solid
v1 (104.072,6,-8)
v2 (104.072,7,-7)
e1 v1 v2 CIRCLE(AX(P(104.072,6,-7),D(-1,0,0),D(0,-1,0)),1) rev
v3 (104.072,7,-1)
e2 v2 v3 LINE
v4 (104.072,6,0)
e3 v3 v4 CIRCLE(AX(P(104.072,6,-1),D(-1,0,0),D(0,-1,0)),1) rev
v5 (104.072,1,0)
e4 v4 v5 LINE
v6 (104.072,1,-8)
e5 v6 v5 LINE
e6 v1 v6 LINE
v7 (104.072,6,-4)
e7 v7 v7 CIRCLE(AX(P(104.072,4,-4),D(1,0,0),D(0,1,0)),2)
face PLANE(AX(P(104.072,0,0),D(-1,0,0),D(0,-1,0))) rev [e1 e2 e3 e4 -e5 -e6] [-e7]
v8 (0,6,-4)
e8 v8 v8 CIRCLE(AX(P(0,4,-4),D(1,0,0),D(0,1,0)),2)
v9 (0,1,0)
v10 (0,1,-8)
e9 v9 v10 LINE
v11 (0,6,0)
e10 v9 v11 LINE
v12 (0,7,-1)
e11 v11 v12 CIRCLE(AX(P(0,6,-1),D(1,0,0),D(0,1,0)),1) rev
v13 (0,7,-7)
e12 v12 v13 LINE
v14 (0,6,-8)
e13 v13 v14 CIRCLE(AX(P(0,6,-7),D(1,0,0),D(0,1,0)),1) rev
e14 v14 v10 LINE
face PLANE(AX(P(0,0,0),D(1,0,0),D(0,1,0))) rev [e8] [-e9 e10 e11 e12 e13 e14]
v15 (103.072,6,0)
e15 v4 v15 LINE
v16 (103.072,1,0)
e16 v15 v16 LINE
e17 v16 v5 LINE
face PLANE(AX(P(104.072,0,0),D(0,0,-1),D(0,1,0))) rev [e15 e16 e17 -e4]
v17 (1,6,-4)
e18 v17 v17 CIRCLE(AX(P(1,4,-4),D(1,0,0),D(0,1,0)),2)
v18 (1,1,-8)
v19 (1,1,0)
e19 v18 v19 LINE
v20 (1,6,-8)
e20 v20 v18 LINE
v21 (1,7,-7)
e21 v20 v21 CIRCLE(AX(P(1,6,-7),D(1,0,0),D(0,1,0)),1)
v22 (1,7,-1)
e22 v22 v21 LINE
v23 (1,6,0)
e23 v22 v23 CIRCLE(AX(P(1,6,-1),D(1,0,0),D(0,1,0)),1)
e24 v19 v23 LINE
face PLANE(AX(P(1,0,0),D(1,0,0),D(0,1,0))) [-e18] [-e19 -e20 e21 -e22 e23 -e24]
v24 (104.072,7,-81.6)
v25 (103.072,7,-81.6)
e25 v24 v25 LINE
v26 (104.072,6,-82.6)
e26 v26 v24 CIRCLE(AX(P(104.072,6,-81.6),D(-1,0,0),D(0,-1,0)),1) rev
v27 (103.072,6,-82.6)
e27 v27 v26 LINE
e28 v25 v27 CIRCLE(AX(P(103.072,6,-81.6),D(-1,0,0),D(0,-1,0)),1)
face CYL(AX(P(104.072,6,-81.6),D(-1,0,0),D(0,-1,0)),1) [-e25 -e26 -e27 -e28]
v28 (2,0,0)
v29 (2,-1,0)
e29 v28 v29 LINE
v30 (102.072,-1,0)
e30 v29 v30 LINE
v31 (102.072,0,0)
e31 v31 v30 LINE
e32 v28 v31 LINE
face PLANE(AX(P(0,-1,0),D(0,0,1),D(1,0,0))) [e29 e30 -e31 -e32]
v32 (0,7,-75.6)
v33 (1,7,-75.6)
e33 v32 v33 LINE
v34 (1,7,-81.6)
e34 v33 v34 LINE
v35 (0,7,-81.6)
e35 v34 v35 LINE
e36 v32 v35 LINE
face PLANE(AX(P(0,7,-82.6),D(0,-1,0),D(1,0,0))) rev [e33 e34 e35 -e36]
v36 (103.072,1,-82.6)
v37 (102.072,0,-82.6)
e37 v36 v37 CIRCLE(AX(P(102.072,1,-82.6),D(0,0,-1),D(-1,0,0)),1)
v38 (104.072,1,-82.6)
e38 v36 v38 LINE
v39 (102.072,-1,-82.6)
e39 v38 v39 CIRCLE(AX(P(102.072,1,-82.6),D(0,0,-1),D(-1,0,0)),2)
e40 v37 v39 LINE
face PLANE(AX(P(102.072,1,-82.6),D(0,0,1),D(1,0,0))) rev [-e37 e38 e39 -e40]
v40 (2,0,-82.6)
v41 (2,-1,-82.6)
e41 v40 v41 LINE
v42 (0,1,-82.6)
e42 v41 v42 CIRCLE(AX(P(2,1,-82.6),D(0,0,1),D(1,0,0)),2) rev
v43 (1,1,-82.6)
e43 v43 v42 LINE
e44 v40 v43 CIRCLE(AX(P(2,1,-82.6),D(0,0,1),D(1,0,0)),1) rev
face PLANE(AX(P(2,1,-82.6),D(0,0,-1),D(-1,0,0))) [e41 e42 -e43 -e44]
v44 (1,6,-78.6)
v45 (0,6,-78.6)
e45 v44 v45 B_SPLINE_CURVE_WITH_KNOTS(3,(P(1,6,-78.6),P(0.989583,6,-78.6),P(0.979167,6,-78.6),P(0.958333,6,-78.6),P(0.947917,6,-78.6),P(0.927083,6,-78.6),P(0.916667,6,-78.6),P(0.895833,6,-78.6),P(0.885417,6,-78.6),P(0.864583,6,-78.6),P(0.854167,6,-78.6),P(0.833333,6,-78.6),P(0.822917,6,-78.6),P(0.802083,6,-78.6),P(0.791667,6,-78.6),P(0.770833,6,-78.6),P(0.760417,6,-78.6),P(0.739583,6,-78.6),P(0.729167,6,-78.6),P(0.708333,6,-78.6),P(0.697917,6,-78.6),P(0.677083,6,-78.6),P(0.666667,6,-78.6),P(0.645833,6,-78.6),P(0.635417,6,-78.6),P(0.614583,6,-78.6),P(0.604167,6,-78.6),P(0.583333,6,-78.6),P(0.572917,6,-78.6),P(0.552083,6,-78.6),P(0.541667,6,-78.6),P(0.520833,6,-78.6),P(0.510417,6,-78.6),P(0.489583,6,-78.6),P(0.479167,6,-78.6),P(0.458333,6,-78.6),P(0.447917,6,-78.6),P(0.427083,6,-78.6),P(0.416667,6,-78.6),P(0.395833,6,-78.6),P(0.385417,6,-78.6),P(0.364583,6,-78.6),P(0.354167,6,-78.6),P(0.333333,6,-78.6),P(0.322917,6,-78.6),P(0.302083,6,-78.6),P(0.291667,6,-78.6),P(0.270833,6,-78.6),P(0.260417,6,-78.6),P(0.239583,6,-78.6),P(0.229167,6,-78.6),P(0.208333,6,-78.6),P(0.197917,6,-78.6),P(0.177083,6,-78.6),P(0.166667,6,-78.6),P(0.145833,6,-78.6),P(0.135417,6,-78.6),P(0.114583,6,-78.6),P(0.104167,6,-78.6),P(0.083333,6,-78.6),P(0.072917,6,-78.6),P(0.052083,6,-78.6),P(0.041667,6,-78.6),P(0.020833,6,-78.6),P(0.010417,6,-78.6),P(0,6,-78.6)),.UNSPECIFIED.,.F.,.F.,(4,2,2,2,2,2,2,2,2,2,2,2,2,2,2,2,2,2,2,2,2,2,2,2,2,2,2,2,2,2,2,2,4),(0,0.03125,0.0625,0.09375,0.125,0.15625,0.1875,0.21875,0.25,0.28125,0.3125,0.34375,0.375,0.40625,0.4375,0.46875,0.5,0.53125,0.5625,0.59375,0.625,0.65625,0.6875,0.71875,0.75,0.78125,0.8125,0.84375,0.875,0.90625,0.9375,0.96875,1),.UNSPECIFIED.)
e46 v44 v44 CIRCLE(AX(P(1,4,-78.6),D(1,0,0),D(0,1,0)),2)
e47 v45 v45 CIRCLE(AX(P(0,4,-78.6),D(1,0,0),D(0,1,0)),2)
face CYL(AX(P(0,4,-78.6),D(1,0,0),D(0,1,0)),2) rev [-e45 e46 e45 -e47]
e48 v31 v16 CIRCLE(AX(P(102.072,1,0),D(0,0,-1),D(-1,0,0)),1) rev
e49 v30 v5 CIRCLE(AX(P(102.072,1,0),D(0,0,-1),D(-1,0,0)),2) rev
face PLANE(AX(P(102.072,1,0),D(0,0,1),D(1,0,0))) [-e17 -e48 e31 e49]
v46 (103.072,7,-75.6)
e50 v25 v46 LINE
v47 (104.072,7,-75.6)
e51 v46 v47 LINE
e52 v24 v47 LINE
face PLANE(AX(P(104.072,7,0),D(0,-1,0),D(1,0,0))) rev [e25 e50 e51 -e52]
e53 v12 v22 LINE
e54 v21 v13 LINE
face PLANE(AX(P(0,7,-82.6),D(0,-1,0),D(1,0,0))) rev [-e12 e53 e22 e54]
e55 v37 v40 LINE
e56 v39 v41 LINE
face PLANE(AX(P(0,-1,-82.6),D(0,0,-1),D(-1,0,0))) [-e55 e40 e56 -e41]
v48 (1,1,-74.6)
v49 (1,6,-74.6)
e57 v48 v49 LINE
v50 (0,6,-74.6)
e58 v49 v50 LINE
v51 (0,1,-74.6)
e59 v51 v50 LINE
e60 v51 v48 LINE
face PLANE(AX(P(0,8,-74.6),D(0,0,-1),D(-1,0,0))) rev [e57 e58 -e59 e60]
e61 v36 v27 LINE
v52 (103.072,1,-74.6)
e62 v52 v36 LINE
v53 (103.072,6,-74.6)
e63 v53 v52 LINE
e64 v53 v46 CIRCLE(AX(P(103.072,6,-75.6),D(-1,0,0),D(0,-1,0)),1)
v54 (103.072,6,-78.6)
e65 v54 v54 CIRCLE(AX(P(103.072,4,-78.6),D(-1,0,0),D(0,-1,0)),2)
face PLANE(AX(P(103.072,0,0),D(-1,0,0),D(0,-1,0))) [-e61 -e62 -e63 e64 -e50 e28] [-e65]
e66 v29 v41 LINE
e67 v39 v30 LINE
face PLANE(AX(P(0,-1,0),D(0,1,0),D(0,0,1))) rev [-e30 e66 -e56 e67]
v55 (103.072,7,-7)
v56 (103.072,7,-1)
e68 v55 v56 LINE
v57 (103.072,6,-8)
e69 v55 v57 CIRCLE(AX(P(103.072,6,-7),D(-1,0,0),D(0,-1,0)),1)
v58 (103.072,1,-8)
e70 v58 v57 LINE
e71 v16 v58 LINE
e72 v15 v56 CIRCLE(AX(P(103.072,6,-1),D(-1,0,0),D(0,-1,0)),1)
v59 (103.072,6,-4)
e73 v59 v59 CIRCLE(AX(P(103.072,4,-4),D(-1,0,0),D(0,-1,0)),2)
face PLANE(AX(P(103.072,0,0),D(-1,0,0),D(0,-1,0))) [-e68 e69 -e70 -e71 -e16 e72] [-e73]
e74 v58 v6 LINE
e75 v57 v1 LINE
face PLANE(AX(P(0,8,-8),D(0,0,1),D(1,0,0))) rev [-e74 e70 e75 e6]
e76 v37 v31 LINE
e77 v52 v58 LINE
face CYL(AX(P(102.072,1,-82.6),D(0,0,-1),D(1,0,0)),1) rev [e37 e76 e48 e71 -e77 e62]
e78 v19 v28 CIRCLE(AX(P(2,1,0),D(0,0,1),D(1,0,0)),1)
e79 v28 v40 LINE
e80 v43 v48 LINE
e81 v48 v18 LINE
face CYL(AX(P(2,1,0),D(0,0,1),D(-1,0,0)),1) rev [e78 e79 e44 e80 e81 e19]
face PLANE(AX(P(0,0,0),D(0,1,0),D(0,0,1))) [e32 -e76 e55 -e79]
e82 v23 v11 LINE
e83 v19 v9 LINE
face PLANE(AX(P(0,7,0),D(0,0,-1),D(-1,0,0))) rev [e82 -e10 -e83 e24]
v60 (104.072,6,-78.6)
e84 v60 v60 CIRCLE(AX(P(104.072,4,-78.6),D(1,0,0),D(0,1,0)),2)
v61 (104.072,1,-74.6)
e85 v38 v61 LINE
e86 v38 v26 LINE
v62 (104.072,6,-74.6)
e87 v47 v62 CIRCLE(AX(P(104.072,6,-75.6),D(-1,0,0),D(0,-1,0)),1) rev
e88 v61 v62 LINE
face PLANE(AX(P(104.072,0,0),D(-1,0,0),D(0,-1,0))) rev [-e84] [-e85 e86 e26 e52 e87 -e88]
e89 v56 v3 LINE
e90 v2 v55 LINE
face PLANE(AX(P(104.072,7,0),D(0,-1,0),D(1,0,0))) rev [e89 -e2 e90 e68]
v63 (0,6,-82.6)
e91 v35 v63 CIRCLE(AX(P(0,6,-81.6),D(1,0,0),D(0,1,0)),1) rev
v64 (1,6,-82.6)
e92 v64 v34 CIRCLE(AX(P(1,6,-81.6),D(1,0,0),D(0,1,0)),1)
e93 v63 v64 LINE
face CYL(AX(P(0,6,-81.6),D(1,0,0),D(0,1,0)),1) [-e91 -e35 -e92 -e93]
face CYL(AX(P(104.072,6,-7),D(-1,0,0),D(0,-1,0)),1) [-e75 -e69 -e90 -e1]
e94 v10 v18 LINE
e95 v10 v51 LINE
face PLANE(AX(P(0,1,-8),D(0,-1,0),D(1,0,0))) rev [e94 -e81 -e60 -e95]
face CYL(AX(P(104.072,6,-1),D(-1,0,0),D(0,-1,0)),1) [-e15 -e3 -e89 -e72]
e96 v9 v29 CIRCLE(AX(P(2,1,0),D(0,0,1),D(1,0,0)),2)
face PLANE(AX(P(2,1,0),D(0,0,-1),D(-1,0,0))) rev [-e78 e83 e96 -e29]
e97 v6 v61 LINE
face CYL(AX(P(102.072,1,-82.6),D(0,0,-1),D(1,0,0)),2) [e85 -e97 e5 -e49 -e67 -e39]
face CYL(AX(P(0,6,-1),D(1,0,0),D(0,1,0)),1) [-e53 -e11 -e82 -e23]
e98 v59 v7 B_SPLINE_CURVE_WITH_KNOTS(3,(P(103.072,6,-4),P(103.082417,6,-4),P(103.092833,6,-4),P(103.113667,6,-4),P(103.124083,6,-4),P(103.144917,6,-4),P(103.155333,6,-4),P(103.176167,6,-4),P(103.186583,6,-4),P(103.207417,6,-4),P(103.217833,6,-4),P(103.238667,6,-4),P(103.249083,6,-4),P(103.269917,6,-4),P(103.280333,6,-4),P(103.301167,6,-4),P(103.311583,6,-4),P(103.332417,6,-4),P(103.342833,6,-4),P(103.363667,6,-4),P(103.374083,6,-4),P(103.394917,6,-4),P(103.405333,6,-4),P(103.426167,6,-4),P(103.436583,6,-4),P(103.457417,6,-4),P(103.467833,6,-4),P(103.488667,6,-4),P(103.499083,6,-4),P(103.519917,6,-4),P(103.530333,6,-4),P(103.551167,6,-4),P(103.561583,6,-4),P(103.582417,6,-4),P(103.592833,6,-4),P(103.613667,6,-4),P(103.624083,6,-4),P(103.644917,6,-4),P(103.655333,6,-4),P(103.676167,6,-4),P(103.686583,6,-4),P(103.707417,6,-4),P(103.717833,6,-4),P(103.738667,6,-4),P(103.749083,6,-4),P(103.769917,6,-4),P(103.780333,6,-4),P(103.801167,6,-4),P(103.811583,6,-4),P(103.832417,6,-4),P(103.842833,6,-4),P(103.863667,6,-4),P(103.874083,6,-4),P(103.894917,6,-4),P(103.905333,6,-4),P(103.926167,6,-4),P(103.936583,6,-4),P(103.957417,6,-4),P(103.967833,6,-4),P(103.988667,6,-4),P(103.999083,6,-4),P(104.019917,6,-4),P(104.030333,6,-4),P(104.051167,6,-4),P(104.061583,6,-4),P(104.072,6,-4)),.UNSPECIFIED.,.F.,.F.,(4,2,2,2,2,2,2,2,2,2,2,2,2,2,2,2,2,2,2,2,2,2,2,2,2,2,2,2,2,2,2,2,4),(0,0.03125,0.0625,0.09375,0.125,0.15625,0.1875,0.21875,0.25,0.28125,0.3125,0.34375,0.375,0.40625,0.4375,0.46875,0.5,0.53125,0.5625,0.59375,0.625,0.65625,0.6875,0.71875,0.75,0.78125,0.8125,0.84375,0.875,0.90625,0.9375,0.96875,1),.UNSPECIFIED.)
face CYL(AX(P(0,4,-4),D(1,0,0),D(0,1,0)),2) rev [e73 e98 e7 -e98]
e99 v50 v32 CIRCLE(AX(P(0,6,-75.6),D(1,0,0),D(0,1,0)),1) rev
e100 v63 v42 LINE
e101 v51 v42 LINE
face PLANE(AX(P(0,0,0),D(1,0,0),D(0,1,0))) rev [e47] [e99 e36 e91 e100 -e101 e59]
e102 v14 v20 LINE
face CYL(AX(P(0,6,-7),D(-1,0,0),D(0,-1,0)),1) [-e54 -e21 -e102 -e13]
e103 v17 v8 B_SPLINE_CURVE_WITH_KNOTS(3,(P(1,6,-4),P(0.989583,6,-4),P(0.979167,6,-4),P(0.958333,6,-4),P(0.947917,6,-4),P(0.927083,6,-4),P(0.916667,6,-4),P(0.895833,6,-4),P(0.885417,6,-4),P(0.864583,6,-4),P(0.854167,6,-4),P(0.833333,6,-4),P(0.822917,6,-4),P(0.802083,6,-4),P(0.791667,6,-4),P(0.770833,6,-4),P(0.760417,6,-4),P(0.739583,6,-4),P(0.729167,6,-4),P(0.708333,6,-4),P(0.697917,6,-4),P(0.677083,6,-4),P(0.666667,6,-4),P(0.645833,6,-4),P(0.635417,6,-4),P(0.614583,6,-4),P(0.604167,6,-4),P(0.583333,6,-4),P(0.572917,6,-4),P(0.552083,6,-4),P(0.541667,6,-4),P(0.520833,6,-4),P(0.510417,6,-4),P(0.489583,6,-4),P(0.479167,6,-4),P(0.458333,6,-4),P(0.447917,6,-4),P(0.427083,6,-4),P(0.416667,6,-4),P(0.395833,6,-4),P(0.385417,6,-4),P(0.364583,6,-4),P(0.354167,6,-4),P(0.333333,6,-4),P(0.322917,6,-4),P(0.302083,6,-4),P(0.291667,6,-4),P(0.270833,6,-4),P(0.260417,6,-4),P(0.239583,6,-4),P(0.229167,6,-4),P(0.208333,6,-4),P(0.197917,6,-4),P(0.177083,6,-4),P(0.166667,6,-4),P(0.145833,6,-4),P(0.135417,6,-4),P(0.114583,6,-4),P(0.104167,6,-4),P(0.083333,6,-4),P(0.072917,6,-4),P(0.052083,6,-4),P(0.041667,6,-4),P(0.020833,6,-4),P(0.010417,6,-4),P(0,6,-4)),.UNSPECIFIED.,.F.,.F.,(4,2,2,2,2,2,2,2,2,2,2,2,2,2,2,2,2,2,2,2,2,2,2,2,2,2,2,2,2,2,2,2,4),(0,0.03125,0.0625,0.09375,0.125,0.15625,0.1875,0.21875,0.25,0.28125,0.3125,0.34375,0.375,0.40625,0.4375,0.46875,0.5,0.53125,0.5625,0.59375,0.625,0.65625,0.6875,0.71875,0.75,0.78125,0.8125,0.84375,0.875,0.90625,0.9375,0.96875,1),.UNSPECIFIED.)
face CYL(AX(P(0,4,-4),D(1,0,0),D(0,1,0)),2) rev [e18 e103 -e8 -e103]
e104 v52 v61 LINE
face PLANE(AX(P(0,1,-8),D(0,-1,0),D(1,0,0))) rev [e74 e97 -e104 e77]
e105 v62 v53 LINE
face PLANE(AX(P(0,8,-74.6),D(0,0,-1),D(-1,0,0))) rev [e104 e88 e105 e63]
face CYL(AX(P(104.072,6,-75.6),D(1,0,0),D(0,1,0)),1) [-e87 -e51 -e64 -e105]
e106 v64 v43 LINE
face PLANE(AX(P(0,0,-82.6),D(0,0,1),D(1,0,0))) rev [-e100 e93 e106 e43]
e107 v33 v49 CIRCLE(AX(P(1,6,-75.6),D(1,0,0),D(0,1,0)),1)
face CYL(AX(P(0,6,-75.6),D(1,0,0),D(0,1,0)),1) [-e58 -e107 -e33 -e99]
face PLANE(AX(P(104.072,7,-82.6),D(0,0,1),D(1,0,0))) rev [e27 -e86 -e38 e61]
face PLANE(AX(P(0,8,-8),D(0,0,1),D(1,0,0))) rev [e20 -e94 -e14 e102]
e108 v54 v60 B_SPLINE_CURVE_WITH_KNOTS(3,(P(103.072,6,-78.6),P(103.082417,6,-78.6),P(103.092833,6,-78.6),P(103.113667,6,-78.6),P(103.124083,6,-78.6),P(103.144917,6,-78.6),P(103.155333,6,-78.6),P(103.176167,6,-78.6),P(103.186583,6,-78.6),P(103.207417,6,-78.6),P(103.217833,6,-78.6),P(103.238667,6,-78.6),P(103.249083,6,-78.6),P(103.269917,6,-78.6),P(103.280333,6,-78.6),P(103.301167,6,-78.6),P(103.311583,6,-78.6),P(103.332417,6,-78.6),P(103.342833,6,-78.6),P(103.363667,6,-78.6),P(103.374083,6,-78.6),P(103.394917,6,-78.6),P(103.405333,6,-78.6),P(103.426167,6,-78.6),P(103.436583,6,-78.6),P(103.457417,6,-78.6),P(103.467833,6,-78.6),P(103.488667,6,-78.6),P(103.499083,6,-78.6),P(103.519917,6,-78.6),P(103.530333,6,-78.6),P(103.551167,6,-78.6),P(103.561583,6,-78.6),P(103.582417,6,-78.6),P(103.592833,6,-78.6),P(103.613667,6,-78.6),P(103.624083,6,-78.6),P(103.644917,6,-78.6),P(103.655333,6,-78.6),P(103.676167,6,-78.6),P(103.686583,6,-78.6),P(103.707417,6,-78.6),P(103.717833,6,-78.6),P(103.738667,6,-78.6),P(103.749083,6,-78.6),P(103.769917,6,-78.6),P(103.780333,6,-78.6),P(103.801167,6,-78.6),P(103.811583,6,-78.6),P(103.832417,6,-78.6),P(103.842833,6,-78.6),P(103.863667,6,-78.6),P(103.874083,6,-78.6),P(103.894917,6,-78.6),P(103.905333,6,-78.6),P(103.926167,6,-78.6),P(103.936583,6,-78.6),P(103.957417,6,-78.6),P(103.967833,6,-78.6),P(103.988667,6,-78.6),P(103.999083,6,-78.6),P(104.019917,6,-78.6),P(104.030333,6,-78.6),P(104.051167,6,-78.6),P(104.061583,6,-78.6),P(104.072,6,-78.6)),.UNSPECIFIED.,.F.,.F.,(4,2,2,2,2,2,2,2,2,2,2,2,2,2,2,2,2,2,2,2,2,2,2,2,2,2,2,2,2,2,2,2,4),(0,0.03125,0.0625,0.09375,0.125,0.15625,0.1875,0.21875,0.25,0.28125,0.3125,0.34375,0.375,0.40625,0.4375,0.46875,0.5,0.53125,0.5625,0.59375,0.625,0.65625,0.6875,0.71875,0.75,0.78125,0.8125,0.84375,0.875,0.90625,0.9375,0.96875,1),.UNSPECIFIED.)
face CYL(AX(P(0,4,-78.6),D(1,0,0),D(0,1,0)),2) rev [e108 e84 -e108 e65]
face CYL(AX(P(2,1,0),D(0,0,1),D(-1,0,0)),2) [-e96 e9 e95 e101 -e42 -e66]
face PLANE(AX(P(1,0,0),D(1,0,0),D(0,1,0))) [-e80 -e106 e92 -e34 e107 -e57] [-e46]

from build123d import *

# Parameters (mm, degrees)
SKETCH1_W                      = 104.072
SKETCH1_H                      = 82.6
BASE_FLANGE2_DEPTH             = 1
EDGE_FLANGE1_STRIP_W           = 6
EDGE_FLANGE1_STRIP_H           = 1
EDGE_FLANGE1_STRIP_CUT_DEPTH   = 82.6
EDGE_FLANGE1_STRIP_2_W         = 6
EDGE_FLANGE1_STRIP_2_H         = 1
EDGE_FLANGE1_STRIP_CUT_2_DEPTH = 82.6
EDGE_FLANGE1_DEPTH             = 82.6
EDGE_FLANGE1_BEND_DEPTH        = 82.6
SKETCH16_W                     = 66.6
SKETCH16_H                     = 7
CUT_EXTRUDE1_DEPTH             = 134.051648558
FILLET1_R                      = 1
SKETCH17_R                     = 2
CUT_EXTRUDE2_DEPTH             = 134.051648558


# Sheet-metal steps are written as plain solids
with BuildPart() as part:
    # Sketch1 → Base-Flange2 (new body)
    with BuildSketch(Plane(origin=(0, 0, 0), x_dir=(1, 0, 0), z_dir=(0, 1, 0))):
        with Locations((52.036, 41.3)):
            Rectangle(SKETCH1_W, SKETCH1_H)
    extrude(amount=-BASE_FLANGE2_DEPTH)

    # Edge-Flange1 strip (across the edge) → Edge-Flange1 strip cut (cut)
    with BuildSketch(Plane(origin=(104.072, 0, 0), x_dir=(-1, 0, 0), z_dir=(0, 0, -1))):
        with Locations((-1, -0.5)):
            Rectangle(EDGE_FLANGE1_STRIP_W, EDGE_FLANGE1_STRIP_H)
    extrude(amount=EDGE_FLANGE1_STRIP_CUT_DEPTH, mode=Mode.SUBTRACT)

    # Edge-Flange1 strip 2 (across the edge) → Edge-Flange1 strip cut 2 (cut)
    with BuildSketch(Plane.XY.offset(-82.6)):
        with Locations((-1, -0.5)):
            Rectangle(EDGE_FLANGE1_STRIP_2_W, EDGE_FLANGE1_STRIP_2_H)
    extrude(amount=EDGE_FLANGE1_STRIP_CUT_2_DEPTH, mode=Mode.SUBTRACT)

    # Edge-Flange1 section (across the edge) → Edge-Flange1 (add)
    with BuildSketch(Plane(origin=(104.072, 0, 0), x_dir=(-1, 0, 0), z_dir=(0, 0, -1))):
        with BuildLine():
            Line((0, 1), (0, 7))
            Line((0, 7), (1, 7))
            Line((1, 7), (1, 1))
            ThreePointArc((1, 1), (1.292893219, 0.292893219), (2, 0))
            Line((2, 0), (2, -1))
            ThreePointArc((2, -1), (0.585786438, -0.414213562), (0, 1))
        make_face()
    extrude(amount=EDGE_FLANGE1_DEPTH)

    # Edge-Flange1 section 2 (across the edge) → Edge-Flange1 bend (add)
    with BuildSketch(Plane.XY.offset(-82.6)):
        with BuildLine():
            Line((0, 1), (0, 7))
            Line((0, 7), (1, 7))
            Line((1, 7), (1, 1))
            ThreePointArc((1, 1), (1.292893219, 0.292893219), (2, 0))
            Line((2, 0), (2, -1))
            ThreePointArc((2, -1), (0.585786438, -0.414213562), (0, 1))
        make_face()
    extrude(amount=EDGE_FLANGE1_BEND_DEPTH)

    # Sketch16 → Cut-Extrude1 (cut, through all)
    with BuildSketch(Plane(origin=(104.072, 0, 0), x_dir=(0, 0, -1), z_dir=(1, 0, 0))):
        with Locations((41.3, 4.5)):
            Rectangle(SKETCH16_W, SKETCH16_H)
    extrude(amount=-CUT_EXTRUDE1_DEPTH, mode=Mode.SUBTRACT)

    # Fillet1
    fillet1_edges = [part.edges().sort_by_distance(p)[0] for p in [
        (103.572, 7, 0),
        (103.572, 7, -82.6),
        (0.5, 7, -82.6),
        (0.5, 7, 0),
        (0.5, 7, -74.6),
        (0.5, 7, -8),
        (103.572, 7, -8),
        (103.572, 7, -74.6),
    ]]
    fillet(fillet1_edges, radius=FILLET1_R)

    # Sketch17 → Cut-Extrude2 (cut, through all)
    with BuildSketch(Plane(origin=(104.072, 0, 0), x_dir=(0, 0, -1), z_dir=(1, 0, 0))):
        with Locations(Location((4, 4, 0), (0, 0, 90))):
            Circle(SKETCH17_R)
        with Locations(Location((78.6, 4, 0), (0, 0, 90))):
            Circle(SKETCH17_R)
    extrude(amount=-CUT_EXTRUDE2_DEPTH, mode=Mode.SUBTRACT)


solid = part.part
